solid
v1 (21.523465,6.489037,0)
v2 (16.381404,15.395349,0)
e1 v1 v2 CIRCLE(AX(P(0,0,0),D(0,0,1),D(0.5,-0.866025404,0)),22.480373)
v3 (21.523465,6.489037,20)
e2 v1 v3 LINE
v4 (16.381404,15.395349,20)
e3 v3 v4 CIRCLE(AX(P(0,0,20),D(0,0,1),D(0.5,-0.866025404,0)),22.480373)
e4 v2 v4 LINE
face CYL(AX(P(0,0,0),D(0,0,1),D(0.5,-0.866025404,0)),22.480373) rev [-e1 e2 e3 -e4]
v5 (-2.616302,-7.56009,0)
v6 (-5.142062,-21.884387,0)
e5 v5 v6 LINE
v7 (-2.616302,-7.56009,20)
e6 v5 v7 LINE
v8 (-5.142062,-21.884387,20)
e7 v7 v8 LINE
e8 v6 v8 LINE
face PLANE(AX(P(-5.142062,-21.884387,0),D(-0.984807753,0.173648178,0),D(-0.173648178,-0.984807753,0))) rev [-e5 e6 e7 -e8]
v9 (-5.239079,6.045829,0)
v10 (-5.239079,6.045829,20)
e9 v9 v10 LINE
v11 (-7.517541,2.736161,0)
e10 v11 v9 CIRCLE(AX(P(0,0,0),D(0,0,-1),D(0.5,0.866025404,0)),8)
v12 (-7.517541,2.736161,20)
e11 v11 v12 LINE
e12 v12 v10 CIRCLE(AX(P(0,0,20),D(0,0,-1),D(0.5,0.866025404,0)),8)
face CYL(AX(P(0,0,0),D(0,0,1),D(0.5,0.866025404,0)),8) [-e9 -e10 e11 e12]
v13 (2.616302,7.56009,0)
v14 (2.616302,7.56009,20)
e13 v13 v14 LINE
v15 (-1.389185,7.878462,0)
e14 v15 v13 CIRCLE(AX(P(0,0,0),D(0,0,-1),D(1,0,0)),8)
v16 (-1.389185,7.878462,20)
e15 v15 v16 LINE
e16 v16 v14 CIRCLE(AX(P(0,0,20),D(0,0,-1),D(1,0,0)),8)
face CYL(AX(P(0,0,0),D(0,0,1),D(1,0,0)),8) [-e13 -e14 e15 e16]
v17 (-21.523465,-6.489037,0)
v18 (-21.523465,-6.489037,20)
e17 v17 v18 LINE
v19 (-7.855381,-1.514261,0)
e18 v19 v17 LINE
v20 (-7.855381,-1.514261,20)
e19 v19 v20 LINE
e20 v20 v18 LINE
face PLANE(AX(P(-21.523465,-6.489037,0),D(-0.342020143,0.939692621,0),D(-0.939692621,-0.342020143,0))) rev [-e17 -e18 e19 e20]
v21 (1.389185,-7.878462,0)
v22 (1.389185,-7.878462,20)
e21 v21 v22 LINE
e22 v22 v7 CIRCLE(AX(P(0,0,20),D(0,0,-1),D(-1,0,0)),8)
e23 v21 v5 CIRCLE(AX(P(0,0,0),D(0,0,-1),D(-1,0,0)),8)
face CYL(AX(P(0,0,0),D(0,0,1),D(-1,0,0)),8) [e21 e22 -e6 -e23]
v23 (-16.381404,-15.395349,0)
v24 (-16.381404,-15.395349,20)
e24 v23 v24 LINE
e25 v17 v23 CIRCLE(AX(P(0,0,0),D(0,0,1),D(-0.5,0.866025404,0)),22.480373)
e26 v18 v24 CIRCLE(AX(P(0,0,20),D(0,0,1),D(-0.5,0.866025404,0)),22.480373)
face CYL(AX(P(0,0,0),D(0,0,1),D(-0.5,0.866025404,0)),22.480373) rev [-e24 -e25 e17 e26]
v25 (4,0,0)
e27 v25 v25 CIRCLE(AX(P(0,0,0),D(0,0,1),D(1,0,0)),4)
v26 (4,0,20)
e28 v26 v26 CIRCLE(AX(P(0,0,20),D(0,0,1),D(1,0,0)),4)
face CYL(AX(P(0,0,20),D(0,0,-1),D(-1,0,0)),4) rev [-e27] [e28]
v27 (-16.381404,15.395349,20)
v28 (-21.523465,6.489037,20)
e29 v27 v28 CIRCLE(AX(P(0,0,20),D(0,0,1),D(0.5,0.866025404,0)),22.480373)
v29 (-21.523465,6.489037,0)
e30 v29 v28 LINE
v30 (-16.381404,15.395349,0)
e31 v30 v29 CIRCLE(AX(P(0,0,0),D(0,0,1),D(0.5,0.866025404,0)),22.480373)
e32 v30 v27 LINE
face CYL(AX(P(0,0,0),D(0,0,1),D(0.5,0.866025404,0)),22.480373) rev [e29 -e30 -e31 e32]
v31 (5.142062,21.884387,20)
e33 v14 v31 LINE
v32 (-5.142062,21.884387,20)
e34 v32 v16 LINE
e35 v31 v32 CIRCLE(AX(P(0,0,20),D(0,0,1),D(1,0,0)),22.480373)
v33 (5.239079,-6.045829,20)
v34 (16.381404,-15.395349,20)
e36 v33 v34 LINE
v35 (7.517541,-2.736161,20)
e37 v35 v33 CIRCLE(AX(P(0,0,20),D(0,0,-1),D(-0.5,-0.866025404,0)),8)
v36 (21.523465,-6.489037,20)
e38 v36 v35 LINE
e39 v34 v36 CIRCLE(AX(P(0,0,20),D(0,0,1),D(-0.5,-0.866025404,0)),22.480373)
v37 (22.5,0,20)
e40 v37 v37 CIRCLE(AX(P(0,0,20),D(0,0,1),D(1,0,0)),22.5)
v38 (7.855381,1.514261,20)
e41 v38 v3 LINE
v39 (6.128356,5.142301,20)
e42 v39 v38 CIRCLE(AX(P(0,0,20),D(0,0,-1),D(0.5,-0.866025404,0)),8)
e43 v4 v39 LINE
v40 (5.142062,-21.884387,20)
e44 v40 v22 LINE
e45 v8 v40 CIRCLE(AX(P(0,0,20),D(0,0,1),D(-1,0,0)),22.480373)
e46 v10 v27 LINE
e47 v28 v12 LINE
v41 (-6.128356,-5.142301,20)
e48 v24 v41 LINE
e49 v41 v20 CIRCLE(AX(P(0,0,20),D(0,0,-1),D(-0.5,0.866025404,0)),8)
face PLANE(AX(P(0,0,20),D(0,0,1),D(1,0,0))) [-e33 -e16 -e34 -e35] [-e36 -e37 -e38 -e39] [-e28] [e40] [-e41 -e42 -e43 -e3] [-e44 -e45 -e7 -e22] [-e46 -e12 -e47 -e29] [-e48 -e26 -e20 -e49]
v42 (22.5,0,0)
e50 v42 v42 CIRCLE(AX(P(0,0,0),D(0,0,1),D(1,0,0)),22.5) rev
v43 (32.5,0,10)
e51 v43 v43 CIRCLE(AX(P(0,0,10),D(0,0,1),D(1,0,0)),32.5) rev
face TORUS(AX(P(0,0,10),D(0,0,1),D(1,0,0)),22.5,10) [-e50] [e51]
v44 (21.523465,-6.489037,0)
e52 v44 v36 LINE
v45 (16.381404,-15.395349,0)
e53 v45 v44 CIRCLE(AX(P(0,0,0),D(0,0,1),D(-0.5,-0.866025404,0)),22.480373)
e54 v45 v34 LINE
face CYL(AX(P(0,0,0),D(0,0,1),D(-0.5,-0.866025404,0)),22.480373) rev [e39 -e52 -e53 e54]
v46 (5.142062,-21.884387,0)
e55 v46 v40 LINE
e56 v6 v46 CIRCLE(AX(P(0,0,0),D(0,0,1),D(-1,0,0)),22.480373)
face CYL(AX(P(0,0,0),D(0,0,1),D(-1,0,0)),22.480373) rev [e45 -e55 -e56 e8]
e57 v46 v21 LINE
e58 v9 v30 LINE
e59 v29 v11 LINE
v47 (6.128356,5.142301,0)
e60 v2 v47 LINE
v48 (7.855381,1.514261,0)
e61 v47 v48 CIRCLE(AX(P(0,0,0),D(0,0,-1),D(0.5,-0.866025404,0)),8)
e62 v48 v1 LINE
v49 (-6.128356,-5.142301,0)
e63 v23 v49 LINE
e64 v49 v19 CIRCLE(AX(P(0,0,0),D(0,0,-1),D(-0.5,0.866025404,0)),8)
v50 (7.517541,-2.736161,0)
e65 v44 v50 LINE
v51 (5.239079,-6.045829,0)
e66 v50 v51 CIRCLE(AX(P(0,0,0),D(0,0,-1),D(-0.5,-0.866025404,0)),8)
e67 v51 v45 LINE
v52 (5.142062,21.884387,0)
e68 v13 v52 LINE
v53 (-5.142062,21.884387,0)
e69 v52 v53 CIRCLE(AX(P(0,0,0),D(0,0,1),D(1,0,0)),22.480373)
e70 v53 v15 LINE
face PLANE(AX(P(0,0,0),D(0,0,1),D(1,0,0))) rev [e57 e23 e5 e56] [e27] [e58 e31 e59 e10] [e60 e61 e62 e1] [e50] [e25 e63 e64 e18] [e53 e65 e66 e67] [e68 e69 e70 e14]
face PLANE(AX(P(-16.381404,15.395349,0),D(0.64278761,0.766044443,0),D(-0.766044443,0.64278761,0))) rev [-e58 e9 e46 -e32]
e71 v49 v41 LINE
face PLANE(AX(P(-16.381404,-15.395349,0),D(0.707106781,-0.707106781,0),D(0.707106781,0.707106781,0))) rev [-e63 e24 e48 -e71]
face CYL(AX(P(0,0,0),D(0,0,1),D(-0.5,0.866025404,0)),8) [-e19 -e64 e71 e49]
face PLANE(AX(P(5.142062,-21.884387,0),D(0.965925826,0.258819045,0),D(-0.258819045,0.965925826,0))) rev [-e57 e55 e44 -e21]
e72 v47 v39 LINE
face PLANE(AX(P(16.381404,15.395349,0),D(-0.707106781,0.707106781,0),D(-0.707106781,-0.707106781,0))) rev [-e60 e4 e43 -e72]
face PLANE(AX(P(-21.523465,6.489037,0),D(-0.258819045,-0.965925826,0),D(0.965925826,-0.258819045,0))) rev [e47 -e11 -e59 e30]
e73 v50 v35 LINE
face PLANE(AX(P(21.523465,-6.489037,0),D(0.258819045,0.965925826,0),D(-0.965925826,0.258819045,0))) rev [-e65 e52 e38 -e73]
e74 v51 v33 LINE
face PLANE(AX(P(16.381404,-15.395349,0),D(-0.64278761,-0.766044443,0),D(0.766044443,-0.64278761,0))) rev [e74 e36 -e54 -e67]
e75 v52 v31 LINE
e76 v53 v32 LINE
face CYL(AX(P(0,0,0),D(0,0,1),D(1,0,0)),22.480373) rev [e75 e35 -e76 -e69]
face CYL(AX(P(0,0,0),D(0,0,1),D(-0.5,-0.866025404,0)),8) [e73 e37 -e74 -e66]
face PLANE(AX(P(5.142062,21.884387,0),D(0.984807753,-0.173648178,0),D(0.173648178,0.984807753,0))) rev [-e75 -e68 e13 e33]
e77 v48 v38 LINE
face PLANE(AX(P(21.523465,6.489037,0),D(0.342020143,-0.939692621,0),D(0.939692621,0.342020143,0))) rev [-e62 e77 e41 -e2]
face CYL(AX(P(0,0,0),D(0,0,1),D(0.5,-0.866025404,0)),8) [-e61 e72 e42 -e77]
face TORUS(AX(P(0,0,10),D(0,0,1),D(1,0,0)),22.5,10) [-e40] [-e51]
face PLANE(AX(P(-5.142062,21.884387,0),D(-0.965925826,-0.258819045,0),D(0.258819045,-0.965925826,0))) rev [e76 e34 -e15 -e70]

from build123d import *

# Parameters (mm, degrees)
SKETCH_1_R               = 32.5
SKETCH_1_R_2             = 4
EXTRUDE_1_DEPTH          = 20
FILLET_1_R               = 10
CUT_EXTRUDE_1_DEPTH      = 20
PATTERN_CIRCULAR_1_COUNT = 6


with BuildPart() as part:
    # 草图1 → 凸台-拉伸1 (new body)
    with BuildSketch(Plane.XY):
        Circle(SKETCH_1_R)
        Circle(SKETCH_1_R_2, mode=Mode.SUBTRACT)
    extrude(amount=EXTRUDE_1_DEPTH)

    # 圆角1
    fillet_1_edges = [part.edges().sort_by_distance(p)[0] for p in [
        (-32.5, 0, 0),
        (-32.5, 0, 20),
    ]]
    fillet(fillet_1_edges, radius=FILLET_1_R - 0.0001)  # a hair under: the kernel refuses the full size

    # 草图2 → 切除-拉伸1 (cut)
    with BuildSketch(Plane.XY.offset(20)):
        with BuildLine():
            Line((-5.142061575, 21.884386505), (-1.389185421, 7.878462024))
            ThreePointArc((-1.389185421, 7.878462024), (0.633872, 7.974848355), (2.616301677, 7.560090313))
            Line((2.616301677, 7.560090313), (5.142061575, 21.884386505))
            ThreePointArc((5.142061575, 21.884386505), (0, 22.480372994), (-5.142061575, 21.884386505))
        make_face()
    cut_extrude_1 = extrude(amount=-CUT_EXTRUDE_1_DEPTH, mode=Mode.SUBTRACT)

    # 阵列(圆周)1: 切除-拉伸1 ×6 about axis
    pattern_circular_1_axis = Axis((0, 0, 0), (0, 0, 1))
    for i in range(1, PATTERN_CIRCULAR_1_COUNT):
        add(cut_extrude_1.rotate(pattern_circular_1_axis, i * 360 / PATTERN_CIRCULAR_1_COUNT), mode=Mode.SUBTRACT)


solid = part.part
